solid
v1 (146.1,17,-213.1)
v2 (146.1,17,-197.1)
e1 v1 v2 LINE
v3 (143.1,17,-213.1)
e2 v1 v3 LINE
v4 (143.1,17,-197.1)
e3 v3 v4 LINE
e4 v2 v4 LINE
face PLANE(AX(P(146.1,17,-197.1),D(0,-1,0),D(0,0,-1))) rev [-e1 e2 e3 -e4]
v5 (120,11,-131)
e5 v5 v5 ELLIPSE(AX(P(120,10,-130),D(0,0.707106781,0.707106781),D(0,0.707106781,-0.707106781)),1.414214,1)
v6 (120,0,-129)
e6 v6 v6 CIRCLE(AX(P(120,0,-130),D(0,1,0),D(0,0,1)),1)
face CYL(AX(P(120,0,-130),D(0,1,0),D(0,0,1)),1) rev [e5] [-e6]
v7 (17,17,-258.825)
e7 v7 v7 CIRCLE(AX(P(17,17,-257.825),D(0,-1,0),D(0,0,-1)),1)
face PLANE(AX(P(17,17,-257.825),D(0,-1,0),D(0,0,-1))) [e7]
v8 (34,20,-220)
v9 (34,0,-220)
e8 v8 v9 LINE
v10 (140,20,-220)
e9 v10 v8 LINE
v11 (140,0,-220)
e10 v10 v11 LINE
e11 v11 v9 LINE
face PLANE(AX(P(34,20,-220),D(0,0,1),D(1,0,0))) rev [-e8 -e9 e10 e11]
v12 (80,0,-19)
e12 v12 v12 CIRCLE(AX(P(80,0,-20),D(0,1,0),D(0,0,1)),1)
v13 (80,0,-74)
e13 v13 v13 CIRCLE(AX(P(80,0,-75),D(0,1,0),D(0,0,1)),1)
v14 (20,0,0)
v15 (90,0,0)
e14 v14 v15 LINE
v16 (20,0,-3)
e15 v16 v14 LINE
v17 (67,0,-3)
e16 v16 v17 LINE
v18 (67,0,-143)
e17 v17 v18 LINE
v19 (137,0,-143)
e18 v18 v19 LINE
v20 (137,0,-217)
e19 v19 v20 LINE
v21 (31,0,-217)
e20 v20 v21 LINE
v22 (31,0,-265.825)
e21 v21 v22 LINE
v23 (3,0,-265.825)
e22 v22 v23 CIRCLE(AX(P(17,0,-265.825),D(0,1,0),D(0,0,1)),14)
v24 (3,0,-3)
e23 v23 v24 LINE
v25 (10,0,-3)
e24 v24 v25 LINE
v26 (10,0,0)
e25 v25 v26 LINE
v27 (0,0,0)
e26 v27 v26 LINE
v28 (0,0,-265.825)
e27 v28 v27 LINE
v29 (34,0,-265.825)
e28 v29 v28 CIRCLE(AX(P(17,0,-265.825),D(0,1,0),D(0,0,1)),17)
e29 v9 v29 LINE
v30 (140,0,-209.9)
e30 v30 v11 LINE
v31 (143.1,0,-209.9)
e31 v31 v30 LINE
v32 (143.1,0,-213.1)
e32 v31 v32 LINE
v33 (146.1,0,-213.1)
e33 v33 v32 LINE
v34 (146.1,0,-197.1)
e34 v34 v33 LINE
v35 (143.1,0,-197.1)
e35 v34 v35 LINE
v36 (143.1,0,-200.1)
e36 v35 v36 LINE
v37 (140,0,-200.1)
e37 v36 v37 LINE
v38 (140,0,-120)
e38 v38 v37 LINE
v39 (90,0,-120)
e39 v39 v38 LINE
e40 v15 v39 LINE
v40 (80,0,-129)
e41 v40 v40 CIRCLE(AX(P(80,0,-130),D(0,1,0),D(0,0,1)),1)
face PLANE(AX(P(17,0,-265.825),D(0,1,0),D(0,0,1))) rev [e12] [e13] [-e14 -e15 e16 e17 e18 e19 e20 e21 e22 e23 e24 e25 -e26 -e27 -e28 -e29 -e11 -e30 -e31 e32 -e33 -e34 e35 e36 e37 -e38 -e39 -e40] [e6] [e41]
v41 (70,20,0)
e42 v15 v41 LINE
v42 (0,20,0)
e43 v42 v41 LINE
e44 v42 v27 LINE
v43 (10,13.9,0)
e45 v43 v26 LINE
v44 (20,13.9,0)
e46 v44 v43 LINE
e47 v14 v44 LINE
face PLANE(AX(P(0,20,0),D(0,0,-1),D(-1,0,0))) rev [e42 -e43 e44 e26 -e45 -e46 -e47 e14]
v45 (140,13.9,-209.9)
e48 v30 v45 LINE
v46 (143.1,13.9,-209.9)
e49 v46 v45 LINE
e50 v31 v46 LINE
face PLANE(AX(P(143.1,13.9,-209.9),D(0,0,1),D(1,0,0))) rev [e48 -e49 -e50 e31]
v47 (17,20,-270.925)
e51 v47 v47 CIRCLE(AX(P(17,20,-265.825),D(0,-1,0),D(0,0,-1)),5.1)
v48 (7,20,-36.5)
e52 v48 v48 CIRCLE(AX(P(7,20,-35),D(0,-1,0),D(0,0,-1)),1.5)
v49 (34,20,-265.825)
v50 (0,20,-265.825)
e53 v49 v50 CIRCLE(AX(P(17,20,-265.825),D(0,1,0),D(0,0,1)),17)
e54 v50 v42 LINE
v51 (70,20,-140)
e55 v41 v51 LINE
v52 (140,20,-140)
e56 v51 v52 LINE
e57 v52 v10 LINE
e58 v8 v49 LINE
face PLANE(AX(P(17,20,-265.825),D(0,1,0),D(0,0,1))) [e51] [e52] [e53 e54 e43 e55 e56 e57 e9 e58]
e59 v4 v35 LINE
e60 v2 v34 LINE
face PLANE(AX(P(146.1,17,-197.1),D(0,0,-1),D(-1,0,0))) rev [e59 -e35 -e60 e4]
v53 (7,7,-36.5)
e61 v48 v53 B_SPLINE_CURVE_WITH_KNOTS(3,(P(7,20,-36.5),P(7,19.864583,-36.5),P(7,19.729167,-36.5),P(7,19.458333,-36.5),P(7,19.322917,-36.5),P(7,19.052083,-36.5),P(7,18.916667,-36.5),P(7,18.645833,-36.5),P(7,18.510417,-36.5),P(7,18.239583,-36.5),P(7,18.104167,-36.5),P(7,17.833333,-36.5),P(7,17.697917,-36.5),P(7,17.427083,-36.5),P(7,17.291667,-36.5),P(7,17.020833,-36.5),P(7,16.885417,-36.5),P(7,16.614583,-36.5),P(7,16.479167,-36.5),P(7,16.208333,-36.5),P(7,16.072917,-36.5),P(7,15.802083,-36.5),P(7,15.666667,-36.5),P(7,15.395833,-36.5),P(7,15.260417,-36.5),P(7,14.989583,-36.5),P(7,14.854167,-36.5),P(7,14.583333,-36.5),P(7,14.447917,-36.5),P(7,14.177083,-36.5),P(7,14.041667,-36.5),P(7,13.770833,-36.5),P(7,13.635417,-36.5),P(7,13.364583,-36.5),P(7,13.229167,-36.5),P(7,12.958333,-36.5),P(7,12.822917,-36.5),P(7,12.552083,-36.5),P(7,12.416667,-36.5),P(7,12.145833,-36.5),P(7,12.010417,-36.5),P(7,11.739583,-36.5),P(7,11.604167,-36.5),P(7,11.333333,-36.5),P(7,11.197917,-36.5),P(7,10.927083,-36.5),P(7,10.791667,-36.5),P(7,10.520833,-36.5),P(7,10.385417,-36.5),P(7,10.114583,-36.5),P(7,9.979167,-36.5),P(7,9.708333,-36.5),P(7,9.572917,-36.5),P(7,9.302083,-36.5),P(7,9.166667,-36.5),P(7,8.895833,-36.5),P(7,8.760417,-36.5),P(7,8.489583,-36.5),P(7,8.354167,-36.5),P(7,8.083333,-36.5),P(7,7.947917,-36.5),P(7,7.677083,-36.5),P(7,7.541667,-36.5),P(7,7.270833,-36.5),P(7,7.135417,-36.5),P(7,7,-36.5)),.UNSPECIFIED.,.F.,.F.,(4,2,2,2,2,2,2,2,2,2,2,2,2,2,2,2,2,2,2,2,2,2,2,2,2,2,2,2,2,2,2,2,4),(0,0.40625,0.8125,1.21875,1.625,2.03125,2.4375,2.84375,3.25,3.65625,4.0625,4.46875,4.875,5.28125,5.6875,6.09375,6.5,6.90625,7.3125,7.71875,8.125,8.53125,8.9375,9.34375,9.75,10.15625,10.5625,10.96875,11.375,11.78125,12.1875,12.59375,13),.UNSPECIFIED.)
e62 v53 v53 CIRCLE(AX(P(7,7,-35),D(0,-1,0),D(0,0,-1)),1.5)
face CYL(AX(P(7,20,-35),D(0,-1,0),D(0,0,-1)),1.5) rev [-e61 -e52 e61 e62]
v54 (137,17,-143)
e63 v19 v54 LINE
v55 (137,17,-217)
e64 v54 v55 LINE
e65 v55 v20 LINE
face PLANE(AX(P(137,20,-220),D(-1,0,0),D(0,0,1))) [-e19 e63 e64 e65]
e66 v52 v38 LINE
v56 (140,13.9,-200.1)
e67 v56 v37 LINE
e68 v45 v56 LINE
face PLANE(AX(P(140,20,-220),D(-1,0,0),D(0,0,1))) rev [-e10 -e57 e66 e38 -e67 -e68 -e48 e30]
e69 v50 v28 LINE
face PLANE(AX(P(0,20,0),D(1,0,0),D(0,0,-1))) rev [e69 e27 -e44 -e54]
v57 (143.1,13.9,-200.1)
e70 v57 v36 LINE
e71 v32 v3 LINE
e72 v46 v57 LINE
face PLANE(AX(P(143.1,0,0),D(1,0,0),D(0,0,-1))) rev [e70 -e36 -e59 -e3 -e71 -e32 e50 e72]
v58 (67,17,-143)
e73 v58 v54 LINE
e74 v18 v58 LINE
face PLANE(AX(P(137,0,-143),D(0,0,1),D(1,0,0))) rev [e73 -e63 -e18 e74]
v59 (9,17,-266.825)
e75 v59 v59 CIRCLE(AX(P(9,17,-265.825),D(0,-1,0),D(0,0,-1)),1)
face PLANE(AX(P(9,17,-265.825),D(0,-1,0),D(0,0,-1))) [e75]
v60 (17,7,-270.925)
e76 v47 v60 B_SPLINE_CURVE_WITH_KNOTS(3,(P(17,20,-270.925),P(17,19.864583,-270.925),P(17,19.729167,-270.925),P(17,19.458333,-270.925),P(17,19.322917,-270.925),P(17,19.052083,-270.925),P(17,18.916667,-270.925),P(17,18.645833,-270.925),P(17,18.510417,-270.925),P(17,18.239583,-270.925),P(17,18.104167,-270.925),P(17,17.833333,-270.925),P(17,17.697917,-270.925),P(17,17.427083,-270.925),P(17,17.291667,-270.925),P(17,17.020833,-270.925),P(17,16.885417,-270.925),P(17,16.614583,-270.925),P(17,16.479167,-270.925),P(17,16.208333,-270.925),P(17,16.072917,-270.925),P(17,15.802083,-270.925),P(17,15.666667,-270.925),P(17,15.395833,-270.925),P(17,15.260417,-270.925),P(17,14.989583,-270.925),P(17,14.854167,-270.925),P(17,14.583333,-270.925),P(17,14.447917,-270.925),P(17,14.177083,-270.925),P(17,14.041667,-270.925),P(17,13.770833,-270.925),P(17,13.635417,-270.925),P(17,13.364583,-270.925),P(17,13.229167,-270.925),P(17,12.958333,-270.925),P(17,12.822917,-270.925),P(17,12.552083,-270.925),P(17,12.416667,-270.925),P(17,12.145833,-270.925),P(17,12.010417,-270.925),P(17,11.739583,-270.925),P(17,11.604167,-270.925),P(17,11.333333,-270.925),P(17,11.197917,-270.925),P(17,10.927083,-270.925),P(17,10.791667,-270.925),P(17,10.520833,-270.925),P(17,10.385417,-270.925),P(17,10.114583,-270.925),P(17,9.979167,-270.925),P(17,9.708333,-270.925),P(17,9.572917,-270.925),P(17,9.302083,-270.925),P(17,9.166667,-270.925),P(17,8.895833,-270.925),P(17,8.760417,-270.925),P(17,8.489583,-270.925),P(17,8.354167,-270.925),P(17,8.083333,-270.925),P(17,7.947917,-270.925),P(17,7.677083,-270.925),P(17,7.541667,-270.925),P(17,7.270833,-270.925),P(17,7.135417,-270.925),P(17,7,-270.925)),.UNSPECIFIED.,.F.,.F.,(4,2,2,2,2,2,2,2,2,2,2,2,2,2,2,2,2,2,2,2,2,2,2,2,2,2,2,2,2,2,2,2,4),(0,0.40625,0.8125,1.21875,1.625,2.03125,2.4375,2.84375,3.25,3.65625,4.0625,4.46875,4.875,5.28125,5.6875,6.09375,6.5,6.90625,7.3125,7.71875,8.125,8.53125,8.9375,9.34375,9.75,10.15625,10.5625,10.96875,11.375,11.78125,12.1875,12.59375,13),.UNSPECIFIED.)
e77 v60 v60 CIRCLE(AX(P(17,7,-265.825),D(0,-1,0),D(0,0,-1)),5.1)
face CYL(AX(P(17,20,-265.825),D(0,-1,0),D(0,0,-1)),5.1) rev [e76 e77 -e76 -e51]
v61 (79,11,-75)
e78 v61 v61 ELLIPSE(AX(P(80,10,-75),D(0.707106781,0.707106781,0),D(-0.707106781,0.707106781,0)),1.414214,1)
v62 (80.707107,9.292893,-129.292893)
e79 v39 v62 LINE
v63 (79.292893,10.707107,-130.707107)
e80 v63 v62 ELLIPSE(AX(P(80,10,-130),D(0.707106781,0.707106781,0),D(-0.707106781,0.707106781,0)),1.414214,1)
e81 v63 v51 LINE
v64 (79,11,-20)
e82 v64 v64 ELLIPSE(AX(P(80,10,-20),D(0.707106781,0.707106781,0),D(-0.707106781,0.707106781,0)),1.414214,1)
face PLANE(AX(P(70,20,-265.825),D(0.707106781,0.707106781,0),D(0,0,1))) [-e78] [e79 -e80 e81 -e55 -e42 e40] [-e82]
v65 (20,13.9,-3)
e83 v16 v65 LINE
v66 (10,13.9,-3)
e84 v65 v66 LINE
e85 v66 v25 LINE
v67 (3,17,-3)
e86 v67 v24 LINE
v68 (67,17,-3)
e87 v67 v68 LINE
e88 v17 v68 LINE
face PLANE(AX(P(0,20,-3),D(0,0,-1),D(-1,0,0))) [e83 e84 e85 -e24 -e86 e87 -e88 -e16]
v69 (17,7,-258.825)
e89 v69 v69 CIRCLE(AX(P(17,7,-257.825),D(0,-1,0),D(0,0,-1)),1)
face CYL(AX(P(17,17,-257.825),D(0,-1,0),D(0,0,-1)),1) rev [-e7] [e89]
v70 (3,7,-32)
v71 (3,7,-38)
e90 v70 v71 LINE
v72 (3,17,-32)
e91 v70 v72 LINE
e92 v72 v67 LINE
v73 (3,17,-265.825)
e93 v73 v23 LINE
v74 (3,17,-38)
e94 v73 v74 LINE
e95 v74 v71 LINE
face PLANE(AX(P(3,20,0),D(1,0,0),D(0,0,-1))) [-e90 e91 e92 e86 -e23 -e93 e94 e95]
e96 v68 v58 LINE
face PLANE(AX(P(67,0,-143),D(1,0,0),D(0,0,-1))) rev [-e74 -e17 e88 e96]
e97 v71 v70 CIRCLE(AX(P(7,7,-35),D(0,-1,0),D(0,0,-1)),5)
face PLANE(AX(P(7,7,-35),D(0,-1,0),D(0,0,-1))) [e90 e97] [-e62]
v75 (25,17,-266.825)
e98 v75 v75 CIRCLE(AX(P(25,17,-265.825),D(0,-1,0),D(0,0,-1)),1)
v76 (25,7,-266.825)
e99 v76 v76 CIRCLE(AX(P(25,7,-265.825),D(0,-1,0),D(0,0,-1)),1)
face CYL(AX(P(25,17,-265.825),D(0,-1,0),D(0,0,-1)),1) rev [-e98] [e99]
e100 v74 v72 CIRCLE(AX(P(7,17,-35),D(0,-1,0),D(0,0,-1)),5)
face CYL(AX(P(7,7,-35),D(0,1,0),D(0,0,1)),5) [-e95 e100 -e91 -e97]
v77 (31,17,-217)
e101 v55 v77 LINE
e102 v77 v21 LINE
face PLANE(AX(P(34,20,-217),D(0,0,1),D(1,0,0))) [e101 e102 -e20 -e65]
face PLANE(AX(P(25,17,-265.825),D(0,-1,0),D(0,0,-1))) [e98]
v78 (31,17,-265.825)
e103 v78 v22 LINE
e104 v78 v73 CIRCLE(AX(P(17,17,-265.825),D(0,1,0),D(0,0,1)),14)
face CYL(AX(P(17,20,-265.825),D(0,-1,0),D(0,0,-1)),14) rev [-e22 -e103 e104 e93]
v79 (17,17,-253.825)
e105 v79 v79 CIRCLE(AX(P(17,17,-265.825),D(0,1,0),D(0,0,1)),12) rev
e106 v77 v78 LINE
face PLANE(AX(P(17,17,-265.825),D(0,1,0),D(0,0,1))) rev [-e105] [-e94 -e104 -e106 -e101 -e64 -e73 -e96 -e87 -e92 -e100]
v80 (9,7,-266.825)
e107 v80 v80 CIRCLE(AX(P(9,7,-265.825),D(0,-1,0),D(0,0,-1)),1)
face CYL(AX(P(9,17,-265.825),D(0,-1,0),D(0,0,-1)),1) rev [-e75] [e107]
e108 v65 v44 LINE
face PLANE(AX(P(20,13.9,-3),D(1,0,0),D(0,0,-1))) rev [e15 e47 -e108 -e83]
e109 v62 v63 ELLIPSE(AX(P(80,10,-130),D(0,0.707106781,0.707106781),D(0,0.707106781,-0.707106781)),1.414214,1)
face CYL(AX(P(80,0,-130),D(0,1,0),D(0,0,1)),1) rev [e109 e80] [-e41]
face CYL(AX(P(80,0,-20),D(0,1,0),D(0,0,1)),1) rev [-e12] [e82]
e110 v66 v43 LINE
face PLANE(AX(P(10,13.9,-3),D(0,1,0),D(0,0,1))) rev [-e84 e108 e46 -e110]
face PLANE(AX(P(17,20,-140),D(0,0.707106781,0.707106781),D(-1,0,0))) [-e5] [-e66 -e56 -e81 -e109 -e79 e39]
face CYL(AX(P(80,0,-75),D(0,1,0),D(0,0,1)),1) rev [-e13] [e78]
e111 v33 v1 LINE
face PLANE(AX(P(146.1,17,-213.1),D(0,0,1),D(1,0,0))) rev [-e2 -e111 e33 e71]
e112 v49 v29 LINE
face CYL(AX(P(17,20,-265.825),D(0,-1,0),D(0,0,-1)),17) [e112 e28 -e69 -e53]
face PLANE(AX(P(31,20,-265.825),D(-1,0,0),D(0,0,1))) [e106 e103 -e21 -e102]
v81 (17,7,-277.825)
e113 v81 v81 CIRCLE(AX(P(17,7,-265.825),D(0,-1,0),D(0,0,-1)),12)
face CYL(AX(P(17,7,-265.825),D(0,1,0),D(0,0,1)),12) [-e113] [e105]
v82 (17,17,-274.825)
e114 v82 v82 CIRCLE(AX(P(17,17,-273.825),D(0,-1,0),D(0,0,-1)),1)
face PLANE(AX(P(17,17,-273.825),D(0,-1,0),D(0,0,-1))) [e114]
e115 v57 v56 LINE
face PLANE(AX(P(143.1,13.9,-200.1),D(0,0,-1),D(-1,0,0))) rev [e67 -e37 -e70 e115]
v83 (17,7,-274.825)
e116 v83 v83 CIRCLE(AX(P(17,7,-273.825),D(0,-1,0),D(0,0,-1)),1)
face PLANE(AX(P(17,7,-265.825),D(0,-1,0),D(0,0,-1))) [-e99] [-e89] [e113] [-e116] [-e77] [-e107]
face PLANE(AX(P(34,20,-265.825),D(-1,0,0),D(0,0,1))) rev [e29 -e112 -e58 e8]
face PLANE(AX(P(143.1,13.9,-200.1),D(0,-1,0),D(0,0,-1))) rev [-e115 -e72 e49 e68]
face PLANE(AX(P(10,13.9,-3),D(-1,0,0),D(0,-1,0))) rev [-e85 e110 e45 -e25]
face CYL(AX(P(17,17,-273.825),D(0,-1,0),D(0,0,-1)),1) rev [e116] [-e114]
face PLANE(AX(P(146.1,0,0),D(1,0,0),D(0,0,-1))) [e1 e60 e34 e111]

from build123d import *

# Parameters (mm, degrees)
CORNERBOSS_EXTRUDE1_DEPTH               = 20
SHELL2_T                                = -3
PUTBACKSHELLBOSS_EXTRUDE1_DEPTH         = 17
TAB_HOLES_SKETCH1_R                     = 1
TABHOLESCUT_EXTRUDE1_DEPTH              = 317.211923597
PADSKETCH3_R                            = 12
PADSKETCH3_R_2                          = 5
PADBOSS_EXTRUDE2_DEPTH                  = 10
STEPPERSHAFTHOLESKETCH4_R               = 5.1
STEPPERSHAFTHOLESKETCH4_R_2             = 1.5
STEPPERSHAFTCUT_EXTRUDE2_DEPTH          = 316.846451025
THREADEDNUTMOUNTHOLESSKETCH5_R          = 1
THREADEDNUTMOUNTHOLESCUT_EXTRUDE4_DEPTH = 10
TRPEGSKETCH1_W                          = 9.8
TRPEGSKETCH1_H                          = 13.9
TRPEGBOSS_EXTRUDE1_DEPTH                = 3.1
TRPEGCAPSKETCH2_W                       = 16
TRPEGCAPSKETCH2_H                       = 17
TRPEGCAPBOSS_EXTRUDE2_DEPTH             = 3
BOTTOMPEGHOLESKETCH3_W                  = 10
BOTTOMPEGHOLESKETCH3_H                  = 13.9
BOTTOMPEGHOLECUT_EXTRUDE1_DEPTH         = 3


with BuildPart() as part:
    # CornerrSketch1 → CornerBoss-Extrude1 (new body)
    with BuildSketch(Plane(origin=(0, 0, 0), x_dir=(1, 0, 0), z_dir=(0, 1, 0))):
        with BuildLine():
            Line((140, 220), (140, 120))
            Line((140, 120), (90, 120))
            Line((90, 120), (90, 0))
            Line((90, 0), (0, 0))
            Line((0, 0), (0, 265.825))
            ThreePointArc((0, 265.825), (17, 282.825), (34, 265.825))
            Line((34, 265.825), (34, 220))
            Line((34, 220), (140, 220))
        make_face()
    extrude(amount=CORNERBOSS_EXTRUDE1_DEPTH)

    # Shell2
    shell2_openings = [part.faces().sort_by_distance(p)[0] for p in [
        (55.952693014, 0, -131.673048366),
    ]]
    offset(amount=SHELL2_T, openings=shell2_openings, kind=Kind.INTERSECTION)

    # PutBackShellSketch2 → PutBackShellBoss-Extrude1 (add)
    with BuildSketch(Plane.XZ.offset(-17)):
        Polygon((67, -3), (87, -3), (87, -123), (137, -123), (137, -143), (67, -143), align=None)
    extrude(amount=PUTBACKSHELLBOSS_EXTRUDE1_DEPTH)

    # Tab holes-Sketch1 → TabHolesCut-Extrude1 (cut, through all)
    with BuildSketch(Plane(origin=(0, 20, 0), x_dir=(1, 0, 0), z_dir=(0, 1, 0))):
        with Locations(Location((120, 130, 0), (0, 0, 270))):
            Circle(TAB_HOLES_SKETCH1_R)
        with Locations(Location((80, 130, 0), (0, 0, 270))):
            Circle(TAB_HOLES_SKETCH1_R)
        with Locations(Location((80, 75, 0), (0, 0, 270))):
            Circle(TAB_HOLES_SKETCH1_R)
        with Locations(Location((80, 20, 0), (0, 0, 270))):
            Circle(TAB_HOLES_SKETCH1_R)
    extrude(amount=-TABHOLESCUT_EXTRUDE1_DEPTH, mode=Mode.SUBTRACT)

    # PadSketch3 → PadBoss-Extrude2 (add)
    with BuildSketch(Plane.XZ.offset(-17)):
        with Locations(Location((17, -265.825, 0), (0, 0, 90))):
            Circle(PADSKETCH3_R)
        with Locations((7, -35)):
            Circle(PADSKETCH3_R_2)
    extrude(amount=PADBOSS_EXTRUDE2_DEPTH)

    # StepperShaftHoleSketch4 → StepperShaftCut-Extrude2 (cut, through all)
    with BuildSketch(Plane.XZ.offset(-7)):
        with Locations(Location((17, -265.825, 0), (0, 0, 270))):
            Circle(STEPPERSHAFTHOLESKETCH4_R)
        with Locations(Location((7, -35, 0), (0, 0, 270))):
            Circle(STEPPERSHAFTHOLESKETCH4_R_2)
    extrude(amount=-STEPPERSHAFTCUT_EXTRUDE2_DEPTH, mode=Mode.SUBTRACT)

    # ThreadedNutMountHolesSketch5 → ThreadedNutMountHolesCut-Extrude4 (cut)
    with BuildSketch(Plane(origin=(0, 7, 0), x_dir=(-1, 0, 0), z_dir=(0, -1, 0))):
        with Locations(Location((-17, 273.825, 0), (0, 0, 90))):
            Circle(THREADEDNUTMOUNTHOLESSKETCH5_R)
        with Locations(Location((-9, 265.825, 0), (0, 0, 90))):
            Circle(THREADEDNUTMOUNTHOLESSKETCH5_R)
        with Locations(Location((-17, 257.825, 0), (0, 0, 90))):
            Circle(THREADEDNUTMOUNTHOLESSKETCH5_R)
        with Locations(Location((-25, 265.825, 0), (0, 0, 90))):
            Circle(THREADEDNUTMOUNTHOLESSKETCH5_R)
    extrude(amount=-THREADEDNUTMOUNTHOLESCUT_EXTRUDE4_DEPTH, mode=Mode.SUBTRACT)

    # TRPegSketch1 → TRPegBoss-Extrude1 (add)
    with BuildSketch(Plane(origin=(140, 0, 0), x_dir=(0, 0, -1), z_dir=(1, 0, 0))):
        with Locations((205, 6.95)):
            Rectangle(TRPEGSKETCH1_W, TRPEGSKETCH1_H)
    extrude(amount=TRPEGBOSS_EXTRUDE1_DEPTH)

    # TRPegCapSketch2 → TRPegCapBoss-Extrude2 (add)
    with BuildSketch(Plane(origin=(143.1, 0, 0), x_dir=(0, 0, -1), z_dir=(1, 0, 0))):
        with Locations((205.1, 8.5)):
            Rectangle(TRPEGCAPSKETCH2_W, TRPEGCAPSKETCH2_H)
    extrude(amount=TRPEGCAPBOSS_EXTRUDE2_DEPTH)

    # BottomPegHoleSketch3 → BottomPegHoleCut-Extrude1 (cut)
    with BuildSketch(Plane.XY):
        with Locations((15, 6.95)):
            Rectangle(BOTTOMPEGHOLESKETCH3_W, BOTTOMPEGHOLESKETCH3_H)
    extrude(amount=-BOTTOMPEGHOLECUT_EXTRUDE1_DEPTH, mode=Mode.SUBTRACT)

    # OverlapChamfer1
    # the kernel refuses this chamfer: 20 mm, written as the material it takes off along each edge
    with BuildSketch(Plane(origin=(90, 20, -120), x_dir=(0.027495876610586317, -0.9996219169112968, 0), z_dir=(0, 0, 1))) as overlapchamfer1_piece_1:
        with BuildLine():
            Line((20.573463904, 0), (-1.130943098, -20.54235587))
            Line((-1.130943098, -20.54235587), (-1.530791864, -20.53135752))
            ThreePointArc((-1.530791864, -20.53135752), (-0.682584541, -10.267956593), (-0.399848767, 0.010998351))
            Line((-0.399848767, 0.010998351), (0.010998351, 0.399848767))
            ThreePointArc((0.010998351, 0.399848767), (10.289953294, 0.117112992), (20.584462254, 0.399848767))
            Line((20.584462254, 0.399848767), (20.573463904, 0))
        make_face()
    extrude(amount=120, mode=Mode.SUBTRACT)
    with BuildSketch(Plane(origin=(140, 20, -120), x_dir=(0, -0.9996219169112968, 0.027495876610586317), z_dir=(-1, 0, 0))) as overlapchamfer1_piece_2:
        with BuildLine():
            Line((20.573463904, 0), (-1.130943098, -20.54235587))
            Line((-1.130943098, -20.54235587), (-1.530791864, -20.53135752))
            ThreePointArc((-1.530791864, -20.53135752), (-0.682584541, -10.267956593), (-0.399848767, 0.010998351))
            Line((-0.399848767, 0.010998351), (0.010998351, 0.399848767))
            ThreePointArc((0.010998351, 0.399848767), (10.289953294, 0.117112992), (20.584462254, 0.399848767))
            Line((20.584462254, 0.399848767), (20.573463904, 0))
        make_face()
    extrude(amount=50, mode=Mode.SUBTRACT)
    with BuildSketch(Plane(origin=(90, 20, -171.433659759), x_dir=(0.027495876610586317, -0.9996219169112968, 0), z_dir=(0, 0, 1))) as overlapchamfer1_piece_3a_section:
        with BuildLine():
            Line((20.573463904, 0), (-1.130943098, -20.54235587))
            Line((-1.130943098, -20.54235587), (-1.530791864, -20.53135752))
            ThreePointArc((-1.530791864, -20.53135752), (-0.682584541, -10.267956593), (-0.399848767, 0.010998351))
            Line((-0.399848767, 0.010998351), (0.010998351, 0.399848767))
            ThreePointArc((0.010998351, 0.399848767), (10.289953294, 0.117112992), (20.584462254, 0.399848767))
            Line((20.584462254, 0.399848767), (20.573463904, 0))
        make_face()
    overlapchamfer1_piece_3a = extrude(amount=171.433659759, mode=Mode.PRIVATE)
    overlapchamfer1_piece_3a = split(overlapchamfer1_piece_3a, bisect_by=Plane(origin=(83.404127464, 13.404127464, -120), z_dir=(0, 0, -1)), keep=Keep.TOP, mode=Mode.PRIVATE)
    with BuildSketch(Plane(origin=(140, 20, -120), x_dir=(0, -0.9996219169112968, 0.027495876610586317), z_dir=(-1, 0, 0))) as overlapchamfer1_piece_3b_section:
        with BuildLine():
            Line((20.573463904, 0), (-1.130943098, -20.54235587))
            Line((-1.130943098, -20.54235587), (-1.530791864, -20.53135752))
            ThreePointArc((-1.530791864, -20.53135752), (-0.682584541, -10.267956593), (-0.399848767, 0.010998351))
            Line((-0.399848767, 0.010998351), (0.010998351, 0.399848767))
            ThreePointArc((0.010998351, 0.399848767), (10.289953294, 0.117112992), (20.584462254, 0.399848767))
            Line((20.584462254, 0.399848767), (20.573463904, 0))
        make_face()
    overlapchamfer1_piece_3b = extrude(amount=101.433659759, mode=Mode.PRIVATE)
    overlapchamfer1_piece_3b = split(overlapchamfer1_piece_3b, bisect_by=Plane(origin=(90, 13.404127464, -126.595872536), z_dir=(-1, 0, 0)), keep=Keep.TOP, mode=Mode.PRIVATE)
    overlapchamfer1_piece_3 = overlapchamfer1_piece_3a & overlapchamfer1_piece_3b
    add(overlapchamfer1_piece_3, mode=Mode.SUBTRACT)


solid = part.part
